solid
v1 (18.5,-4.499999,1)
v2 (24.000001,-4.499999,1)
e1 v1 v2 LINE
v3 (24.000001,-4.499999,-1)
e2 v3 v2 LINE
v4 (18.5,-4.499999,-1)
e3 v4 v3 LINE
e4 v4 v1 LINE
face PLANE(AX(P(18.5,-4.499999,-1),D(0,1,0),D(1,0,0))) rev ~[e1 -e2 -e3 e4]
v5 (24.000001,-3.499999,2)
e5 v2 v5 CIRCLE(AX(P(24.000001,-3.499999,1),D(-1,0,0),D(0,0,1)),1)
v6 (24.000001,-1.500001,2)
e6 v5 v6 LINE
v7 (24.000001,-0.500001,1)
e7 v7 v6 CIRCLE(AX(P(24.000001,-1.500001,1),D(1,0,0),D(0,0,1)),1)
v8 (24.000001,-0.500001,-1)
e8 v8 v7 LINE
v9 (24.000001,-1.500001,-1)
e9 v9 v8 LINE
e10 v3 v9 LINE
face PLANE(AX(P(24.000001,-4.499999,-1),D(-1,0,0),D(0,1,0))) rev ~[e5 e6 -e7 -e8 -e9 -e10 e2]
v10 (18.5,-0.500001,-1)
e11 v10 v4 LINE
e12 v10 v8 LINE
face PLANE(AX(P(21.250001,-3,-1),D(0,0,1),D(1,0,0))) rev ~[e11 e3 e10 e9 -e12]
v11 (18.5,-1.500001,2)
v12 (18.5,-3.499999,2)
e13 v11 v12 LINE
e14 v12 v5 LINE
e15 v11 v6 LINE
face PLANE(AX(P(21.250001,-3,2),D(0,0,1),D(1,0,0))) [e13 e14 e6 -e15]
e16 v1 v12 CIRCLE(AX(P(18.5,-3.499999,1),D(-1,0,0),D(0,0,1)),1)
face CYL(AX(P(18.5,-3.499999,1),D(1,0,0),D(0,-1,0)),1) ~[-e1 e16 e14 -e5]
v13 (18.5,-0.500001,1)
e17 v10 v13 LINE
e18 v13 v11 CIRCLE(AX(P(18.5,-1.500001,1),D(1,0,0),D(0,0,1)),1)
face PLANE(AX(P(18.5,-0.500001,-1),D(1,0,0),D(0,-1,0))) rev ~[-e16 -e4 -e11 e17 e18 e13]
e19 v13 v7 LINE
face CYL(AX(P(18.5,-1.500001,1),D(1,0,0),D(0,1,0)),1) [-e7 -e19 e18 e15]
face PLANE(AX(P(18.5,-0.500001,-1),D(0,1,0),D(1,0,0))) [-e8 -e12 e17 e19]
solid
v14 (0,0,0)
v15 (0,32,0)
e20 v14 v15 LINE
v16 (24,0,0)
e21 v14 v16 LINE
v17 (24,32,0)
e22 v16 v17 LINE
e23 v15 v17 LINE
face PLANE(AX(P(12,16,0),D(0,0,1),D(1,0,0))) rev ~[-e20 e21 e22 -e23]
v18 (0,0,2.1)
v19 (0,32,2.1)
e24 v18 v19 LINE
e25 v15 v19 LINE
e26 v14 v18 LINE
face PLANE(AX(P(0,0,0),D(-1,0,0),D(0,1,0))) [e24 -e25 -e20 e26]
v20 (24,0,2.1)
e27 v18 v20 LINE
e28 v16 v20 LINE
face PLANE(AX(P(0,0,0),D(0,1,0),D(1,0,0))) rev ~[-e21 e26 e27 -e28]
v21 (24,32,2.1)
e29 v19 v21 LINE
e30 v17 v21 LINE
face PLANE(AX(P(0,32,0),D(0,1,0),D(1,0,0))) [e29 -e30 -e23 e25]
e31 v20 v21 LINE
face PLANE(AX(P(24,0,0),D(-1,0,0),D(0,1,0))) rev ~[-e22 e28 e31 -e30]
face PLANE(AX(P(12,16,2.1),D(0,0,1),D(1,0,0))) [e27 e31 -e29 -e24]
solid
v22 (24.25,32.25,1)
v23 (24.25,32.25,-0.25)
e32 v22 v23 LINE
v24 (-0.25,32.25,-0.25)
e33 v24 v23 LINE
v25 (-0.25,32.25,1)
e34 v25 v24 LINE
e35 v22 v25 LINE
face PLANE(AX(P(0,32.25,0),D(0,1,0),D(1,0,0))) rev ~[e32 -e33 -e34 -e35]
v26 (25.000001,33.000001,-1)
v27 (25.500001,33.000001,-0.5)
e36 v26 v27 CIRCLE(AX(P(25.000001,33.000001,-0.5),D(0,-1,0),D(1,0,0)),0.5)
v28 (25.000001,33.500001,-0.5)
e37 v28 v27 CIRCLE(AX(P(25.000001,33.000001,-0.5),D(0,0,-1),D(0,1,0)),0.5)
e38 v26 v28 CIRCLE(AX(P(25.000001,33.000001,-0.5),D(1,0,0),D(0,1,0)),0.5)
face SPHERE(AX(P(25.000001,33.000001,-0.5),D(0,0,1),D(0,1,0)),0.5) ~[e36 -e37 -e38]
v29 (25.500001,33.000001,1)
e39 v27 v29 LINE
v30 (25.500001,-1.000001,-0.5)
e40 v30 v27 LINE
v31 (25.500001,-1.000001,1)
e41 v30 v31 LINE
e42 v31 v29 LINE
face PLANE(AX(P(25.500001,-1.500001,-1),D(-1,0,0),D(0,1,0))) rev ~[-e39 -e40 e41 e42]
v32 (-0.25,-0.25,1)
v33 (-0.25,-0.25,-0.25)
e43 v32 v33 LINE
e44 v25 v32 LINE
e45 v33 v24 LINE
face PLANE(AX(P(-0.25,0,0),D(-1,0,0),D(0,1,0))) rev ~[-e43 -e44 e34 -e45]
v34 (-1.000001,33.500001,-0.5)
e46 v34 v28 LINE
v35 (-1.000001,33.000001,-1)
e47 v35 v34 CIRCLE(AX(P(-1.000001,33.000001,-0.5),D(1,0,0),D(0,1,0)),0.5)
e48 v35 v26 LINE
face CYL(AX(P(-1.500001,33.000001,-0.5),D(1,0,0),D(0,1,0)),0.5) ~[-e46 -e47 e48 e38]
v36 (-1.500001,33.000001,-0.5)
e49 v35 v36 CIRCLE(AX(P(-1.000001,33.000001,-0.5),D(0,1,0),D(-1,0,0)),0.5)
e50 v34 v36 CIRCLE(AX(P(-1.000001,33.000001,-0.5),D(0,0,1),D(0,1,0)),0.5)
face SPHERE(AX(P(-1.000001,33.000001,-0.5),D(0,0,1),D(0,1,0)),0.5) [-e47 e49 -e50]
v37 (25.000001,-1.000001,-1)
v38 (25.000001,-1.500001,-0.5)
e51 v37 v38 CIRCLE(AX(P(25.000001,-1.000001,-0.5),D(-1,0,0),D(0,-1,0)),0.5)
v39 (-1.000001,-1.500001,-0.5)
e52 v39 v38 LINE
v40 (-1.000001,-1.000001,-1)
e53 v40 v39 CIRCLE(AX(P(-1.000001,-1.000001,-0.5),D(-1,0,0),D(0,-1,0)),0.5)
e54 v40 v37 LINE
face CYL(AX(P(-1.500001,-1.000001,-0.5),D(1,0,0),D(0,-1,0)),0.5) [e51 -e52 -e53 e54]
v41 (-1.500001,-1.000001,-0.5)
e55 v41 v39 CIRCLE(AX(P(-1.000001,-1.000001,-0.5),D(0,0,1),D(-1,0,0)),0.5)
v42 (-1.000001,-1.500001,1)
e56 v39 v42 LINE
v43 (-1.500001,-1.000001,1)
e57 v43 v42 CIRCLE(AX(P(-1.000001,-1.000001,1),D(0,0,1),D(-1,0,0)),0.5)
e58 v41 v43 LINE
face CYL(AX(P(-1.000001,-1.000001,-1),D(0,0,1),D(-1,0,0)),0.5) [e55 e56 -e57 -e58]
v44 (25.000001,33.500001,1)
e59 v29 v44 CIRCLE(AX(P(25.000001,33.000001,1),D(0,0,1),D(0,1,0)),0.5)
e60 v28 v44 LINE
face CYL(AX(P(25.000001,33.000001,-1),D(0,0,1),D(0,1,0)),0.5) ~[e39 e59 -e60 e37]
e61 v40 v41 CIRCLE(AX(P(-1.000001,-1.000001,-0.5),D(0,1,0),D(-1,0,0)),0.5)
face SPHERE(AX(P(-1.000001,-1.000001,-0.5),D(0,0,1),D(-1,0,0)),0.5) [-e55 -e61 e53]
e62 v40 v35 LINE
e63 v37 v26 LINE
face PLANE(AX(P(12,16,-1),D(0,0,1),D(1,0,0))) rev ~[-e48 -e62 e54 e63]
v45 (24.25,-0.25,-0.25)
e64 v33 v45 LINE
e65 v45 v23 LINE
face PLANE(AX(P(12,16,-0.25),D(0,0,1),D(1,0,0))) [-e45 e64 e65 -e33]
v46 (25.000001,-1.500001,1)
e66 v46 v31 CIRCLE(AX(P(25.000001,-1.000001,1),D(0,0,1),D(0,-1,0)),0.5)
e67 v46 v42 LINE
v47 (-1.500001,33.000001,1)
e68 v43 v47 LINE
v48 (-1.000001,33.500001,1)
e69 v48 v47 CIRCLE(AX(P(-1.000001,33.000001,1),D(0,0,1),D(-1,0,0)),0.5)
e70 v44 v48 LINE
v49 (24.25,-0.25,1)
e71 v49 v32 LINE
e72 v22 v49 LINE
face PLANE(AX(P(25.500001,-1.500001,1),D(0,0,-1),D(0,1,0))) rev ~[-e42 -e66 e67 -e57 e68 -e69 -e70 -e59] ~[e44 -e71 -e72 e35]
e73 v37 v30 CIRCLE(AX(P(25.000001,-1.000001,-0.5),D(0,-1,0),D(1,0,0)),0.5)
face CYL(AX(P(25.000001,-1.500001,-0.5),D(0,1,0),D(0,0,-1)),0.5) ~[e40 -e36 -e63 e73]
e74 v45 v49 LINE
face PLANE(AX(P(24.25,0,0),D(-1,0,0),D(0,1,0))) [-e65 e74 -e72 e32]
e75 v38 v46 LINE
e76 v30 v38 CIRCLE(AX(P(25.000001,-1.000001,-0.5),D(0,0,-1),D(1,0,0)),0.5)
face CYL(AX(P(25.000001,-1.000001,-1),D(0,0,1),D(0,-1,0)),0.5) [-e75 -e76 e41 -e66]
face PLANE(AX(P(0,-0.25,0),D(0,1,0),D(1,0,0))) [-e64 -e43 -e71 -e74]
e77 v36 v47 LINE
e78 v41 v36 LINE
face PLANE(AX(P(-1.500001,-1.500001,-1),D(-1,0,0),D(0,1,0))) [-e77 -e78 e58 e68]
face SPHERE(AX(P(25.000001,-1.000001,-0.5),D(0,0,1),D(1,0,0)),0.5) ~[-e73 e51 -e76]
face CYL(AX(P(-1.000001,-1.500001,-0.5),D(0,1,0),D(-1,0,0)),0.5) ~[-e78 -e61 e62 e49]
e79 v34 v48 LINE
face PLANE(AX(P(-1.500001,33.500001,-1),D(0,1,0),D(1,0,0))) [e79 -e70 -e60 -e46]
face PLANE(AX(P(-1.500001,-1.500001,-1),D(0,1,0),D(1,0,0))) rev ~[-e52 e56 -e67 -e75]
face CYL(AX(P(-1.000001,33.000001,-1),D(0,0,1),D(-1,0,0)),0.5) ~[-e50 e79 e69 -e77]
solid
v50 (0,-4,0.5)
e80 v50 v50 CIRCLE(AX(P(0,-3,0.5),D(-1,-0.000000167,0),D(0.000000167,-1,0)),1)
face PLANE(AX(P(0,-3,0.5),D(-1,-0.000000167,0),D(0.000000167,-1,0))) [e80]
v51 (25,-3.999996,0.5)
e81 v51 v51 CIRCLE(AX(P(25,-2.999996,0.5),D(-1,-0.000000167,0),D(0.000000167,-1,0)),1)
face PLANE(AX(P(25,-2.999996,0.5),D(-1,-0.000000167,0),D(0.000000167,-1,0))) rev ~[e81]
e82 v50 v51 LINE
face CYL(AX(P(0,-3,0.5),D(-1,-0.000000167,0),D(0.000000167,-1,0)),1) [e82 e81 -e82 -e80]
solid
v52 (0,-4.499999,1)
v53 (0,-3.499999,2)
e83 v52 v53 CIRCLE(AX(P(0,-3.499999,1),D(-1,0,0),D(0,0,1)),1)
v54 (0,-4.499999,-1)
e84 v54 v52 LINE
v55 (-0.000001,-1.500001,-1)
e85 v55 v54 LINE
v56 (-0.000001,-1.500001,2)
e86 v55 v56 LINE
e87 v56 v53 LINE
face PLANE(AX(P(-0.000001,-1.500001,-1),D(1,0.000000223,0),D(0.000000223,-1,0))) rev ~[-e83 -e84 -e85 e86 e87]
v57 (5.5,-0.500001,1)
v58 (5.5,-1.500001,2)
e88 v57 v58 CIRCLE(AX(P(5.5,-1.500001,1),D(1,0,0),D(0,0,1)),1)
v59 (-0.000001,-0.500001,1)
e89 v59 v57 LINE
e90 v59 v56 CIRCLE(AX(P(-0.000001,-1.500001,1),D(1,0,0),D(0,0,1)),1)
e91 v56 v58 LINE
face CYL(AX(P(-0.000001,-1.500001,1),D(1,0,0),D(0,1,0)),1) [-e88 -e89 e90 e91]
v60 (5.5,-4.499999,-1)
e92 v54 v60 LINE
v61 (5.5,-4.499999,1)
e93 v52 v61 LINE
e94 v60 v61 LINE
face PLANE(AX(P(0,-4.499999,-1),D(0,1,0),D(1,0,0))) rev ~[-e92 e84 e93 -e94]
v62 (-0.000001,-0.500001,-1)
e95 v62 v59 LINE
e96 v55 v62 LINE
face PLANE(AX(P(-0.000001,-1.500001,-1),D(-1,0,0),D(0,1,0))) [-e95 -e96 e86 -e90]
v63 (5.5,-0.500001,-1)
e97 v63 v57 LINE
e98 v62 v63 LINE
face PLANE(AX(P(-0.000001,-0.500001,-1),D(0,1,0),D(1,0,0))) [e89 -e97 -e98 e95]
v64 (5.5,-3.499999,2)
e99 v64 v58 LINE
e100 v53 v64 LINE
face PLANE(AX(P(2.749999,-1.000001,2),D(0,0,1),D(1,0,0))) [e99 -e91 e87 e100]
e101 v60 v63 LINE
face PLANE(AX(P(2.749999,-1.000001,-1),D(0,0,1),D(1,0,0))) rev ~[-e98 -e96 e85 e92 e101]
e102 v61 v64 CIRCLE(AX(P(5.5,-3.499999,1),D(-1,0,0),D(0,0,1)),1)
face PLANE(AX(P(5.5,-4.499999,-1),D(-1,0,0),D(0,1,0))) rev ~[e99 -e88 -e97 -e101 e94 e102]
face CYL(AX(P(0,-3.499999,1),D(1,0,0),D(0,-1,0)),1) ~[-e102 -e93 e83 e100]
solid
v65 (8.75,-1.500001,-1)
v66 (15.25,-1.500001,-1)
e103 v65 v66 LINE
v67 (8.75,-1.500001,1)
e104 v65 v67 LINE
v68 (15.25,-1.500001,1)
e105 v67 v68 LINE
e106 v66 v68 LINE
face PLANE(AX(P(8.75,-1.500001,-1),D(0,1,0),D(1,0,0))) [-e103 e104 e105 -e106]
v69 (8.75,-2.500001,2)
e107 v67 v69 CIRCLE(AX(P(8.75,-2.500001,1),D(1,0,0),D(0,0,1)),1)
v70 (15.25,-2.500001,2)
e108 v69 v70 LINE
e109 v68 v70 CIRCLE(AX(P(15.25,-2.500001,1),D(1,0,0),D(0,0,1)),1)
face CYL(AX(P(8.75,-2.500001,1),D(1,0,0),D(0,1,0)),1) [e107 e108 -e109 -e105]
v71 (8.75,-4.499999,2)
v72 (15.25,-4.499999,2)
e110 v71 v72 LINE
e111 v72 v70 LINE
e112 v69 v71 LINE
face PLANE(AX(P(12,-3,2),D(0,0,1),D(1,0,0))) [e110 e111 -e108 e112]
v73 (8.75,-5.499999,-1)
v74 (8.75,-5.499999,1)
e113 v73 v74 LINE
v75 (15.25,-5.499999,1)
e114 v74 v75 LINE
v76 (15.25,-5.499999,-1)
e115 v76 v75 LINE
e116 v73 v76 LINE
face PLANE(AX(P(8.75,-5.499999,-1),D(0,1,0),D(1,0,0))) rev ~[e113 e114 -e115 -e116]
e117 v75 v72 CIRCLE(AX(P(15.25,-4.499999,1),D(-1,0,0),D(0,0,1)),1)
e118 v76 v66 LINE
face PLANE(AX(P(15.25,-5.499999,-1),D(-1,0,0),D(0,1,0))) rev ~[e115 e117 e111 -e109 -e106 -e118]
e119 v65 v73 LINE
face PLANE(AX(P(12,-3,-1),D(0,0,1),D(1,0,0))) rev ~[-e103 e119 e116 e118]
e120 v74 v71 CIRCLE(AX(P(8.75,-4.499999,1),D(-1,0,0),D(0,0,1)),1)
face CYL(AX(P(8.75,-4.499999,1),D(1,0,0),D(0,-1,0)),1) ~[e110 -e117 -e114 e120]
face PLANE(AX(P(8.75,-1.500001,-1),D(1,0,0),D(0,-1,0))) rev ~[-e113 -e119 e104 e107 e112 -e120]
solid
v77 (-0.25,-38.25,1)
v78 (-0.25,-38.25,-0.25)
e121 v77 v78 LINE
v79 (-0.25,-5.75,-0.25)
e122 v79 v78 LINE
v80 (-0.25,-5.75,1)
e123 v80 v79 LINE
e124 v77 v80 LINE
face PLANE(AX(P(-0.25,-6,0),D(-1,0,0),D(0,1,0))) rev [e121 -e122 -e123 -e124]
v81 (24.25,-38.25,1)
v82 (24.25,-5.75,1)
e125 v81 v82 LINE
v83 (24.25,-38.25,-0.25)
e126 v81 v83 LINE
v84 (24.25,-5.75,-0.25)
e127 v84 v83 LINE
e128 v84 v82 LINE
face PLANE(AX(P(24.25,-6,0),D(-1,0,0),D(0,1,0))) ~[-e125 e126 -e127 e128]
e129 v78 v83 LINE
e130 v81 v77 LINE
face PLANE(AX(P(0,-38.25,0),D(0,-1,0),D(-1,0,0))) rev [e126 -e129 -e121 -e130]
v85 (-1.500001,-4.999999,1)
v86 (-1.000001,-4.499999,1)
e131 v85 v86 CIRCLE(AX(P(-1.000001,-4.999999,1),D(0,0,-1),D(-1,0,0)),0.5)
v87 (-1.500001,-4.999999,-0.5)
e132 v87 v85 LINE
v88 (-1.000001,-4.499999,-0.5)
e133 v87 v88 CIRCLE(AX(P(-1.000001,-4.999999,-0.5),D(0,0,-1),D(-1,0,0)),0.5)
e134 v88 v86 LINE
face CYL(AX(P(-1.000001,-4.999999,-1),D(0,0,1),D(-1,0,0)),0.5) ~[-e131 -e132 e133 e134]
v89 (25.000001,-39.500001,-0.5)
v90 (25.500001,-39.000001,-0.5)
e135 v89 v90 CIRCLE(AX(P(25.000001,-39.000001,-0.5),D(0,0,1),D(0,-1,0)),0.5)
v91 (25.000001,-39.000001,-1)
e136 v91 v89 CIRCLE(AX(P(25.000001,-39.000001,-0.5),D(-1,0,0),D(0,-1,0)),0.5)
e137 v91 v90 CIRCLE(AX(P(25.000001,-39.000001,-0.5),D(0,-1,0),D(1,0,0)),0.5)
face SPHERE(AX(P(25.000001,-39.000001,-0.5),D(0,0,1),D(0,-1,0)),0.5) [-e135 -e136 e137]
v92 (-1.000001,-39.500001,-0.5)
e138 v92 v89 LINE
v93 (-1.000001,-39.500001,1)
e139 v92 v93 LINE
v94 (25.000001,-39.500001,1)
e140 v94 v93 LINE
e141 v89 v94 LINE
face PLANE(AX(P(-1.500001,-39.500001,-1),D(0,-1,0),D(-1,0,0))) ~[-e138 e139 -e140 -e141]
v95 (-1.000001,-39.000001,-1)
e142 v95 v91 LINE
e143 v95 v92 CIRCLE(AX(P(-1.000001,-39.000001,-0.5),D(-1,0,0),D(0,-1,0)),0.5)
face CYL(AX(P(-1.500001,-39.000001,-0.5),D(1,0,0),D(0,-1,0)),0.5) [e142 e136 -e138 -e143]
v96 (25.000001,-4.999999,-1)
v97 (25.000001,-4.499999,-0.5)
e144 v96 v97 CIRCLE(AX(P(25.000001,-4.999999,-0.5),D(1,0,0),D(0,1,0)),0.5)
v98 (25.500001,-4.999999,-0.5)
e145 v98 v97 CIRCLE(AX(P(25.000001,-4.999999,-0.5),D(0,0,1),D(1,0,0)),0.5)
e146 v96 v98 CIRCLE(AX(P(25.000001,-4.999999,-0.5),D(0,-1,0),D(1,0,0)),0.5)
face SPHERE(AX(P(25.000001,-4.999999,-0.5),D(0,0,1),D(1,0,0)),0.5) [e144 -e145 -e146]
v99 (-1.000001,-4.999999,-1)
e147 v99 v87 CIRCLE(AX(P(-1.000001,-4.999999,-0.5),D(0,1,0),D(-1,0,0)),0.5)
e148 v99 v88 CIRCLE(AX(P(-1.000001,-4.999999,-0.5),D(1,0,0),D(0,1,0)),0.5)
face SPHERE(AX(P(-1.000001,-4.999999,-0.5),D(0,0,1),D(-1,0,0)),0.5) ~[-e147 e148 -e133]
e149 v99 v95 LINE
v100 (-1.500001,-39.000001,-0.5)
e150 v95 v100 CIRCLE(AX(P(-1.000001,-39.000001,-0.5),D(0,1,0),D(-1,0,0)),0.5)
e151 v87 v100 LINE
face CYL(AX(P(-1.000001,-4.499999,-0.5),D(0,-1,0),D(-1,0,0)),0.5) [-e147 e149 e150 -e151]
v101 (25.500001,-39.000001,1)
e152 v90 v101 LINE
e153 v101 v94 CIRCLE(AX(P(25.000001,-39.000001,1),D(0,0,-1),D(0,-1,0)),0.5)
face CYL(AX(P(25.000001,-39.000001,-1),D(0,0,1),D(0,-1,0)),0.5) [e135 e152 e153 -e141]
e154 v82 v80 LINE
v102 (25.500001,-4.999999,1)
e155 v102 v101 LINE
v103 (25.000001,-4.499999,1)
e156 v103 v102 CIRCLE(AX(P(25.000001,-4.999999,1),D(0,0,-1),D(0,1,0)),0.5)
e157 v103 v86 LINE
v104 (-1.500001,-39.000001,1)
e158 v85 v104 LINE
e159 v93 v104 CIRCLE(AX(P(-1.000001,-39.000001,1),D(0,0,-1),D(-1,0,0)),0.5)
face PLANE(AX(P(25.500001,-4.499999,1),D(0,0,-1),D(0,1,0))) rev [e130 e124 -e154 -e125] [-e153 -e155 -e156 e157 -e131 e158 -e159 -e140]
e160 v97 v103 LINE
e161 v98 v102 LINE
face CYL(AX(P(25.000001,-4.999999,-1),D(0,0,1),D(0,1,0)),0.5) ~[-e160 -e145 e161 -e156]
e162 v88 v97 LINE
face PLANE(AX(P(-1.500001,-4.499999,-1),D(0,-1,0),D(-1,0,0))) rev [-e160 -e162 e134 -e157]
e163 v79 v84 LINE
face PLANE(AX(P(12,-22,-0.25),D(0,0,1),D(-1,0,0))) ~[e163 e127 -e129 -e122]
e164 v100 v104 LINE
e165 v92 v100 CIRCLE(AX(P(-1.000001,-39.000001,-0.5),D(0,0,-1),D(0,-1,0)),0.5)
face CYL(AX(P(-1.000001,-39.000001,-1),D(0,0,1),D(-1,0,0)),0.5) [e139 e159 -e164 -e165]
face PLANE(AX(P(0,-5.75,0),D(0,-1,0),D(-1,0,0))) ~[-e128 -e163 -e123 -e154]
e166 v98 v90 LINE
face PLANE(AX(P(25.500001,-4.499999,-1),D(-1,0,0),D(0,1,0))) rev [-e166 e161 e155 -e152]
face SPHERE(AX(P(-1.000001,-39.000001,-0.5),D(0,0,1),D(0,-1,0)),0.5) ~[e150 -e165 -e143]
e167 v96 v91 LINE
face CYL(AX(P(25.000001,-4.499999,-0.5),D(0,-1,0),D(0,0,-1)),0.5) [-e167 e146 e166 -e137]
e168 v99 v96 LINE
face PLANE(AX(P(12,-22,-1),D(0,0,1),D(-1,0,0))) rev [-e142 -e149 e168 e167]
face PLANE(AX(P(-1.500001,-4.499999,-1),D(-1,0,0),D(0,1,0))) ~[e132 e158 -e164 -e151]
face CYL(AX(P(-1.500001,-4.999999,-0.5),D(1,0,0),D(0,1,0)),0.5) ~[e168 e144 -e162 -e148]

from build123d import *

# Parameters (mm, degrees)
F0_W      = 24
F0_H      = 32
F1_DEPTH  = 2.1
F3_W      = 27.0000016689
F3_H      = 35.0000016689
F3_W_2    = 24
F3_H_2    = 32
F4_DEPTH  = 4
F6_OFFSET = 0.25
F7_R      = 0.5
F5_W      = 35.0000016689
F5_H      = 2
F8_DEPTH  = 27.0000016689
F11_W     = 6.5
F11_H     = 2.9999983311
F11_H_2   = 1
F12_DEPTH = 3
F11_W_2   = 5.5000003338
F11_W_3   = 5.5000004172
F13_R     = 1
F14_DEPTH = 25
F15_R     = 1
F15_2_R   = 1
F15_3_R   = 1


with BuildPart() as f1:
    # F0 (on Top) → F1 (new body)
    with BuildSketch(Plane.XY):
        with Locations((12, 16)):
            Rectangle(F0_W, F0_H)
    extrude(amount=F1_DEPTH)


with BuildPart() as f4:
    # F3 (on offset) → F4 (new body)
    with BuildSketch(Plane.XY.offset(-1)):
        with Locations((12, 16)):
            Rectangle(F3_W, F3_H)
        with Locations((12, 16)):
            Rectangle(F3_W_2, F3_H_2, mode=Mode.SUBTRACT)
        with Locations((12, 16)):
            Rectangle(F3_W_2, F3_H_2)
    extrude(amount=F4_DEPTH)

    # F6: cut F1, made larger all round first
    f6_tool = offset(f1.part, amount=F6_OFFSET, kind=Kind.INTERSECTION, mode=Mode.PRIVATE)
    add(f6_tool, mode=Mode.SUBTRACT)

    # F7
    f7_edges = [f4.edges().sort_by_distance(p)[0] for p in [
        (-1.500001, -1.500001, 1),
        (25.500001, -1.500001, 1),
        (25.500001, 33.500001, 1),
        (-1.500001, 33.500001, 1),
        (-1.500001, 16, 3),
        (12, 33.500001, 3),
        (12, 33.500001, -1),
        (-1.500001, 16, -1),
        (25.500001, 16, 3),
        (25.500001, 16, -1),
        (12, -1.500001, 3),
        (12, -1.500001, -1),
    ]]
    fillet(f7_edges, radius=F7_R)

    # F5 (on face) → F8 (cut, through all)
    with BuildSketch(Plane.YZ.offset(25.5000008345)):
        with Locations((16, 2)):
            Rectangle(F5_W, F5_H)
    extrude(amount=-F8_DEPTH, mode=Mode.SUBTRACT)


with BuildPart() as f10_1:
    # F10: instance of F4
    add(f4.part.mirror(Plane.XZ.offset(3)))


with BuildPart() as f12:
    # F11 (on offset) → F12 (new body)
    with BuildSketch(Plane.XY.offset(-1)):
        with Locations((11.9999995828, -3)):
            Rectangle(F11_W, F11_H)
        with Locations((11.9999995828, -4.9999991655)):
            Rectangle(F11_W, F11_H_2)
    extrude(amount=F12_DEPTH)

    # F15
    f15_edges = [f12.edges().sort_by_distance(p)[0] for p in [
        (12, -5.499999, 2),
        (12, -1.500001, 2),
    ]]
    fillet(f15_edges, radius=F15_R)


with BuildPart() as f12b:
    # F11 (on offset) → F12, piece 2 (new body)
    with BuildSketch(Plane.XY.offset(-1)):
        with Locations((21.2500005841, -3)):
            Rectangle(F11_W_2, F11_H)
        with Locations((21.2500006258, -1.0000008345)):
            Rectangle(F11_W_3, F11_H_2)
    extrude(amount=F12_DEPTH)

    # F15#2
    f15_2_edges = [f12b.edges().sort_by_distance(p)[0] for p in [
        (21.250001, -0.500001, 2),
        (21.25, -4.499999, 2),
    ]]
    fillet(f15_2_edges, radius=F15_2_R)


with BuildPart() as f12c:
    # F11 (on offset) → F12, piece 3 (new body)
    with BuildSketch(Plane.XY.offset(-1)):
        with Locations((2.7499993742, -1.0000008345)):
            Rectangle(F11_W_3, F11_H_2)
        Polygon((5.4999995828, -1.5000008345), (-6.676e-07, -1.5000008345), (0, -4.4999991655), (5.4999995828, -4.4999991655), align=None)
    extrude(amount=F12_DEPTH)

    # F15#3
    f15_3_edges = [f12c.edges().sort_by_distance(p)[0] for p in [
        (2.749999, -0.500001, 2),
        (2.75, -4.499999, 2),
    ]]
    fillet(f15_3_edges, radius=F15_3_R)


with BuildPart() as f14:
    # F13 (on face) → F14 (new body)
    with BuildSketch(Plane(origin=(-9.179e-07, 0, 0), x_dir=(1.669e-07, -1, 0), z_dir=(-1, -1.669e-07, 0))):
        with Locations((3, 0.5)):
            Circle(F13_R)
    extrude(amount=-F14_DEPTH)


solid = Compound([f1.part, f4.part, f10_1.part, f12.part, f12b.part, f12c.part, f14.part])
